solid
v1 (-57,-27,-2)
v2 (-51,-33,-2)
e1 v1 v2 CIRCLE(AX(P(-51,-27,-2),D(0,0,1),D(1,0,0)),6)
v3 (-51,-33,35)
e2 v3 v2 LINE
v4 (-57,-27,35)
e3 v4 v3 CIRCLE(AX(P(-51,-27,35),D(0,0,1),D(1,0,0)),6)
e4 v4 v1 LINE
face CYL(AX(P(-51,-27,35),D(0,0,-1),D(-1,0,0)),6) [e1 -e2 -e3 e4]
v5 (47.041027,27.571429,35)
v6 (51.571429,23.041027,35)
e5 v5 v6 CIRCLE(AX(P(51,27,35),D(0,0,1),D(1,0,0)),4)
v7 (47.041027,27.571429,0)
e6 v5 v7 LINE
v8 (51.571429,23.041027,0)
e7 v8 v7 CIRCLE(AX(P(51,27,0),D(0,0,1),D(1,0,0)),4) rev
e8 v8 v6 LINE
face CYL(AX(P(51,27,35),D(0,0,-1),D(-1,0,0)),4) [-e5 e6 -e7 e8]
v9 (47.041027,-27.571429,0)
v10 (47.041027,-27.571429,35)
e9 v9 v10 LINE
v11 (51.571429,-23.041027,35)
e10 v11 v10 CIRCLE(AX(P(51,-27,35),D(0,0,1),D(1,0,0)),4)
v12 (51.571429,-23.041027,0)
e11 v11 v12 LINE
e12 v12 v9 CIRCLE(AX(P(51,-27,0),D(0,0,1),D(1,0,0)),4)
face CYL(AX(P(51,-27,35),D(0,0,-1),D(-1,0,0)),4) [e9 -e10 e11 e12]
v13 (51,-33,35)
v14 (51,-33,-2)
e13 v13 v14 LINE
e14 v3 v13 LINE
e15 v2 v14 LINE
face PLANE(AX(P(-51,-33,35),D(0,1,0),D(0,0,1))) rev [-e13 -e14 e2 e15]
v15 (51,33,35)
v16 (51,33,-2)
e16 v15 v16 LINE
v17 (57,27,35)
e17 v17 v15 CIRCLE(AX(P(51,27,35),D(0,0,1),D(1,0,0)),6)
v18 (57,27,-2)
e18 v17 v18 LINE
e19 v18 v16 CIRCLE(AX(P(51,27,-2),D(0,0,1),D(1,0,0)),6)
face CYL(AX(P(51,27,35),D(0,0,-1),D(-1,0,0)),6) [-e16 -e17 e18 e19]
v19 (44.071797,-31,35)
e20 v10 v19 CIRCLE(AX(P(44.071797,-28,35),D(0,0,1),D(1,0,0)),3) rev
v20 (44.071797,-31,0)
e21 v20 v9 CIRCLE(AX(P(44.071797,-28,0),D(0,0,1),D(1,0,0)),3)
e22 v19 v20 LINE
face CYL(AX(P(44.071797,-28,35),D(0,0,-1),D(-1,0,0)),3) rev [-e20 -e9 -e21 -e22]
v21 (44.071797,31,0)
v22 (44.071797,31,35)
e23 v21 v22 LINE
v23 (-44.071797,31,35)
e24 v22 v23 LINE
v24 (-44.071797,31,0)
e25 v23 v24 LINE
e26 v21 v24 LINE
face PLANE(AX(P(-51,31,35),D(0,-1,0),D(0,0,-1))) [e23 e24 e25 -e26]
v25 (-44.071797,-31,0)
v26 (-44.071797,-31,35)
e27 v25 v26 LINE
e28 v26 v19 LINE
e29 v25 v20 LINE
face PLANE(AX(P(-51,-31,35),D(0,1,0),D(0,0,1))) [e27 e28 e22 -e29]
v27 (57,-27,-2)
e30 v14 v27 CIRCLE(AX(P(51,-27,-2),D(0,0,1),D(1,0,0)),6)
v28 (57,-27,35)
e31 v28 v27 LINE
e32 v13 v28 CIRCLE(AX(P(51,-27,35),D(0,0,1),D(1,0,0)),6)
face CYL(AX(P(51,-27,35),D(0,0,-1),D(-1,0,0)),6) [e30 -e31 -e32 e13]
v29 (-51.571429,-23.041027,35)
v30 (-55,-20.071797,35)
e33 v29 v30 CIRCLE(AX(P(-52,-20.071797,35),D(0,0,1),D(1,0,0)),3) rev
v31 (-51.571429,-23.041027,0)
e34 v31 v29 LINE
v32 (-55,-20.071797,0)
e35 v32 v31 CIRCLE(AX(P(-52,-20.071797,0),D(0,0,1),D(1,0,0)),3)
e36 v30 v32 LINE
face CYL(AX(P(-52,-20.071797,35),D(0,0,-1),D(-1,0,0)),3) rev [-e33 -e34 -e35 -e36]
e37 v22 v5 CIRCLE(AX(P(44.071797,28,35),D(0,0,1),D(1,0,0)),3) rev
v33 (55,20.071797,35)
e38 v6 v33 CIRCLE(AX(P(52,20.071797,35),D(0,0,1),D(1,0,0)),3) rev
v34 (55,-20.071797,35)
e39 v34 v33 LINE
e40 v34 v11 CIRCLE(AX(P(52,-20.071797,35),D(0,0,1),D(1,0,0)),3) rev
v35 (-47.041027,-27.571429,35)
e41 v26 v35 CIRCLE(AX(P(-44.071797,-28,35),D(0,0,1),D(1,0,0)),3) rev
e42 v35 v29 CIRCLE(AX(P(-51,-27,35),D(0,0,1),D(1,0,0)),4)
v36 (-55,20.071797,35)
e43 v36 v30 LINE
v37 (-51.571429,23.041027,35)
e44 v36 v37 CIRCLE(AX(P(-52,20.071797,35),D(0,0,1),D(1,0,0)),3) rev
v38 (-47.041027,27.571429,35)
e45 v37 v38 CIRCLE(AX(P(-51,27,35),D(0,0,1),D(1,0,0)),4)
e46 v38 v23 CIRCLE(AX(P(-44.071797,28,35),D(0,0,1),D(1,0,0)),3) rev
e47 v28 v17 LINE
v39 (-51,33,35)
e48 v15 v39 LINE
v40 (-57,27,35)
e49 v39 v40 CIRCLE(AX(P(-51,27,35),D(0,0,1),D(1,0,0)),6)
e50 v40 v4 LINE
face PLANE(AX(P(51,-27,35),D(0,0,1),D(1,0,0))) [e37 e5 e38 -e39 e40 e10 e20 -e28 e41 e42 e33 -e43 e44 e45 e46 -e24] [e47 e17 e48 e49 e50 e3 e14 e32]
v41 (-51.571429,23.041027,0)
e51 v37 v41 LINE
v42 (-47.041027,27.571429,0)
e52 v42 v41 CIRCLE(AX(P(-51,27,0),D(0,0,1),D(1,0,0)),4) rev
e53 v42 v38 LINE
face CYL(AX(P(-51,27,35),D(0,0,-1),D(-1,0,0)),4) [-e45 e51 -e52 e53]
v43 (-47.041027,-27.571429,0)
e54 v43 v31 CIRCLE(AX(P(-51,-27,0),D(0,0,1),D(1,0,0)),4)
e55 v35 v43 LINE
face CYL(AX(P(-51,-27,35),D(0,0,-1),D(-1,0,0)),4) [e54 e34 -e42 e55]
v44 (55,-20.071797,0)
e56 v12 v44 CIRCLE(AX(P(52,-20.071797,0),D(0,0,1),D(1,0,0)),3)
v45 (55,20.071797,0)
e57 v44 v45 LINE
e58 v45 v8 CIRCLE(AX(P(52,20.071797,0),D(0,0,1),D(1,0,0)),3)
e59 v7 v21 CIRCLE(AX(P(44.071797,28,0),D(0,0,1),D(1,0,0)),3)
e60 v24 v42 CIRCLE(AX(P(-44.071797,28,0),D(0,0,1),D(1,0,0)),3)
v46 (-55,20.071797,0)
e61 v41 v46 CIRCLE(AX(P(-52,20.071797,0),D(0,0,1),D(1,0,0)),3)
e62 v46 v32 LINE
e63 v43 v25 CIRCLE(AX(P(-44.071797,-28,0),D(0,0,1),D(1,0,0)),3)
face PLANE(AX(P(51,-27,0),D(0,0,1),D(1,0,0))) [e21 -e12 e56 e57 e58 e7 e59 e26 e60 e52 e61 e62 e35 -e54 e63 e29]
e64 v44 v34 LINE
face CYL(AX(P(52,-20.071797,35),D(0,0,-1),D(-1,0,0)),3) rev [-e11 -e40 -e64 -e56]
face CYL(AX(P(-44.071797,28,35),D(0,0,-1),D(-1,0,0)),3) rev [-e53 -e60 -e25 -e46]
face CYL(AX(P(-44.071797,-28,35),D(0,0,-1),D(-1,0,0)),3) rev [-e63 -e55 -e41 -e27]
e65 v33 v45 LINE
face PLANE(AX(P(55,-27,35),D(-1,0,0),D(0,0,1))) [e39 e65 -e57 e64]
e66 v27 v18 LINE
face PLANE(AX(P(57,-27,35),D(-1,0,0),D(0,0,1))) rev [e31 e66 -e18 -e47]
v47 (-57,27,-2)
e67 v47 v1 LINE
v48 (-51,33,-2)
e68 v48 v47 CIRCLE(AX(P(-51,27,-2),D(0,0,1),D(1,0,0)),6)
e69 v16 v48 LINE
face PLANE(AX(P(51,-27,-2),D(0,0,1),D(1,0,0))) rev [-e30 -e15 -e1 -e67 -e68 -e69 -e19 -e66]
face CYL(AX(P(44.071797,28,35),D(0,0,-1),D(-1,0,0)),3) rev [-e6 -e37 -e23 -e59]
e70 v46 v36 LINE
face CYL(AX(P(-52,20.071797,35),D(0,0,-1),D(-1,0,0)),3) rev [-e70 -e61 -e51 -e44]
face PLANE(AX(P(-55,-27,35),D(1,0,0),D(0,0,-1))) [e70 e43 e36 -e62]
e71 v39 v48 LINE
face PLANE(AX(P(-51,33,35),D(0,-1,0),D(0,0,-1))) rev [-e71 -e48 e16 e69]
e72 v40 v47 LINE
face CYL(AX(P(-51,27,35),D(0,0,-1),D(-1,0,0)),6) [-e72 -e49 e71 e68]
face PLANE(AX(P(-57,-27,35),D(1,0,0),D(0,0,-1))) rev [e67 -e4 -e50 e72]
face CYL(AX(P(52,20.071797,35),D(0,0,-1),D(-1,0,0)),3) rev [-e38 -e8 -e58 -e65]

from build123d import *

# Parameters (mm, degrees)
BOSS_EXTRUDE1_DEPTH = 35
SHELL1_T            = 2
SKETCH2_R           = 4
BOSS_EXTRUDE2_DEPTH = 35
FILLET2_START       = -1
FILLET2_DEPTH       = 36


with BuildPart() as part:
    # Sketch1 → Boss-Extrude1 (new body)
    with BuildSketch(Plane.XY):
        with BuildLine():
            Line((-51, -31), (51, -31))
            ThreePointArc((51, -31), (53.828427125, -29.828427125), (55, -27))
            Line((55, -27), (55, 27))
            ThreePointArc((55, 27), (53.828427125, 29.828427125), (51, 31))
            Line((51, 31), (-51, 31))
            ThreePointArc((-51, 31), (-53.828427125, 29.828427125), (-55, 27))
            Line((-55, 27), (-55, -27))
            ThreePointArc((-55, -27), (-53.828427125, -29.828427125), (-51, -31))
        make_face()
    extrude(amount=BOSS_EXTRUDE1_DEPTH)

    # Shell1
    shell1_openings = [part.faces().sort_by_distance(p)[0] for p in [
        (0, 0, 35),
    ]]
    offset(amount=SHELL1_T, openings=shell1_openings, kind=Kind.INTERSECTION)

    # Sketch2 → Boss-Extrude2 (add)
    with BuildSketch(Plane.XY):
        with Locations((-51, 27)):
            Circle(SKETCH2_R)
        with Locations((51, 27)):
            Circle(SKETCH2_R)
        with Locations((51, -27)):
            Circle(SKETCH2_R)
        with Locations((-51, -27)):
            Circle(SKETCH2_R)
    extrude(amount=BOSS_EXTRUDE2_DEPTH)

    # Fillet2: read off the stored shape, not the designer's step
    # Fillet2 outline → Fillet2 (add)
    with BuildSketch(Plane.XY.offset(FILLET2_START)):
        with BuildLine():
            ThreePointArc((51, -31), (48.381385317, -30.023715784), (47.041026725, -27.571428571))
            ThreePointArc((47.041026725, -27.571428571), (46.339583608, -29.963961012), (44.07179677, -31))
            Line((44.07179677, -31), (51, -31))
        make_face()
        with BuildLine():
            ThreePointArc((55, -20.07179677), (53.963961012, -22.339583608), (51.571428571, -23.041026726))
            ThreePointArc((51.571428571, -23.041026726), (54.023715784, -24.381385317), (55, -27))
            Line((55, -27), (55, -20.07179677))
        make_face()
        with BuildLine():
            Line((-51, -31), (-44.07179677, -31))
            ThreePointArc((-44.07179677, -31), (-46.339583608, -29.963961012), (-47.041026726, -27.571428571))
            ThreePointArc((-47.041026726, -27.571428571), (-48.381385317, -30.023715784), (-51, -31))
        make_face()
        with BuildLine():
            ThreePointArc((51.571428571, 23.041026726), (53.963961012, 22.339583608), (55, 20.07179677))
            Line((55, 20.07179677), (55, 27))
            ThreePointArc((55, 27), (54.023715784, 24.381385317), (51.571428571, 23.041026726))
        make_face()
        with BuildLine():
            ThreePointArc((-55, -27), (-54.023715784, -24.381385317), (-51.571428571, -23.041026725))
            ThreePointArc((-51.571428571, -23.041026725), (-53.963961012, -22.339583608), (-55, -20.07179677))
            Line((-55, -20.07179677), (-55, -27))
        make_face()
        with BuildLine():
            ThreePointArc((44.07179677, 31), (46.339583608, 29.963961012), (47.041026726, 27.571428571))
            ThreePointArc((47.041026726, 27.571428571), (48.381385317, 30.023715784), (51, 31))
            Line((51, 31), (44.07179677, 31))
        make_face()
        with BuildLine():
            Line((-55, 27), (-55, 20.07179677))
            ThreePointArc((-55, 20.07179677), (-53.963961012, 22.339583608), (-51.571428571, 23.041026726))
            ThreePointArc((-51.571428571, 23.041026726), (-54.023715784, 24.381385317), (-55, 27))
        make_face()
        with BuildLine():
            ThreePointArc((-47.041026726, 27.571428571), (-46.339583608, 29.963961012), (-44.07179677, 31))
            Line((-44.07179677, 31), (-51, 31))
            ThreePointArc((-51, 31), (-48.381385317, 30.023715784), (-47.041026726, 27.571428571))
        make_face()
    extrude(amount=FILLET2_DEPTH)


solid = part.part
